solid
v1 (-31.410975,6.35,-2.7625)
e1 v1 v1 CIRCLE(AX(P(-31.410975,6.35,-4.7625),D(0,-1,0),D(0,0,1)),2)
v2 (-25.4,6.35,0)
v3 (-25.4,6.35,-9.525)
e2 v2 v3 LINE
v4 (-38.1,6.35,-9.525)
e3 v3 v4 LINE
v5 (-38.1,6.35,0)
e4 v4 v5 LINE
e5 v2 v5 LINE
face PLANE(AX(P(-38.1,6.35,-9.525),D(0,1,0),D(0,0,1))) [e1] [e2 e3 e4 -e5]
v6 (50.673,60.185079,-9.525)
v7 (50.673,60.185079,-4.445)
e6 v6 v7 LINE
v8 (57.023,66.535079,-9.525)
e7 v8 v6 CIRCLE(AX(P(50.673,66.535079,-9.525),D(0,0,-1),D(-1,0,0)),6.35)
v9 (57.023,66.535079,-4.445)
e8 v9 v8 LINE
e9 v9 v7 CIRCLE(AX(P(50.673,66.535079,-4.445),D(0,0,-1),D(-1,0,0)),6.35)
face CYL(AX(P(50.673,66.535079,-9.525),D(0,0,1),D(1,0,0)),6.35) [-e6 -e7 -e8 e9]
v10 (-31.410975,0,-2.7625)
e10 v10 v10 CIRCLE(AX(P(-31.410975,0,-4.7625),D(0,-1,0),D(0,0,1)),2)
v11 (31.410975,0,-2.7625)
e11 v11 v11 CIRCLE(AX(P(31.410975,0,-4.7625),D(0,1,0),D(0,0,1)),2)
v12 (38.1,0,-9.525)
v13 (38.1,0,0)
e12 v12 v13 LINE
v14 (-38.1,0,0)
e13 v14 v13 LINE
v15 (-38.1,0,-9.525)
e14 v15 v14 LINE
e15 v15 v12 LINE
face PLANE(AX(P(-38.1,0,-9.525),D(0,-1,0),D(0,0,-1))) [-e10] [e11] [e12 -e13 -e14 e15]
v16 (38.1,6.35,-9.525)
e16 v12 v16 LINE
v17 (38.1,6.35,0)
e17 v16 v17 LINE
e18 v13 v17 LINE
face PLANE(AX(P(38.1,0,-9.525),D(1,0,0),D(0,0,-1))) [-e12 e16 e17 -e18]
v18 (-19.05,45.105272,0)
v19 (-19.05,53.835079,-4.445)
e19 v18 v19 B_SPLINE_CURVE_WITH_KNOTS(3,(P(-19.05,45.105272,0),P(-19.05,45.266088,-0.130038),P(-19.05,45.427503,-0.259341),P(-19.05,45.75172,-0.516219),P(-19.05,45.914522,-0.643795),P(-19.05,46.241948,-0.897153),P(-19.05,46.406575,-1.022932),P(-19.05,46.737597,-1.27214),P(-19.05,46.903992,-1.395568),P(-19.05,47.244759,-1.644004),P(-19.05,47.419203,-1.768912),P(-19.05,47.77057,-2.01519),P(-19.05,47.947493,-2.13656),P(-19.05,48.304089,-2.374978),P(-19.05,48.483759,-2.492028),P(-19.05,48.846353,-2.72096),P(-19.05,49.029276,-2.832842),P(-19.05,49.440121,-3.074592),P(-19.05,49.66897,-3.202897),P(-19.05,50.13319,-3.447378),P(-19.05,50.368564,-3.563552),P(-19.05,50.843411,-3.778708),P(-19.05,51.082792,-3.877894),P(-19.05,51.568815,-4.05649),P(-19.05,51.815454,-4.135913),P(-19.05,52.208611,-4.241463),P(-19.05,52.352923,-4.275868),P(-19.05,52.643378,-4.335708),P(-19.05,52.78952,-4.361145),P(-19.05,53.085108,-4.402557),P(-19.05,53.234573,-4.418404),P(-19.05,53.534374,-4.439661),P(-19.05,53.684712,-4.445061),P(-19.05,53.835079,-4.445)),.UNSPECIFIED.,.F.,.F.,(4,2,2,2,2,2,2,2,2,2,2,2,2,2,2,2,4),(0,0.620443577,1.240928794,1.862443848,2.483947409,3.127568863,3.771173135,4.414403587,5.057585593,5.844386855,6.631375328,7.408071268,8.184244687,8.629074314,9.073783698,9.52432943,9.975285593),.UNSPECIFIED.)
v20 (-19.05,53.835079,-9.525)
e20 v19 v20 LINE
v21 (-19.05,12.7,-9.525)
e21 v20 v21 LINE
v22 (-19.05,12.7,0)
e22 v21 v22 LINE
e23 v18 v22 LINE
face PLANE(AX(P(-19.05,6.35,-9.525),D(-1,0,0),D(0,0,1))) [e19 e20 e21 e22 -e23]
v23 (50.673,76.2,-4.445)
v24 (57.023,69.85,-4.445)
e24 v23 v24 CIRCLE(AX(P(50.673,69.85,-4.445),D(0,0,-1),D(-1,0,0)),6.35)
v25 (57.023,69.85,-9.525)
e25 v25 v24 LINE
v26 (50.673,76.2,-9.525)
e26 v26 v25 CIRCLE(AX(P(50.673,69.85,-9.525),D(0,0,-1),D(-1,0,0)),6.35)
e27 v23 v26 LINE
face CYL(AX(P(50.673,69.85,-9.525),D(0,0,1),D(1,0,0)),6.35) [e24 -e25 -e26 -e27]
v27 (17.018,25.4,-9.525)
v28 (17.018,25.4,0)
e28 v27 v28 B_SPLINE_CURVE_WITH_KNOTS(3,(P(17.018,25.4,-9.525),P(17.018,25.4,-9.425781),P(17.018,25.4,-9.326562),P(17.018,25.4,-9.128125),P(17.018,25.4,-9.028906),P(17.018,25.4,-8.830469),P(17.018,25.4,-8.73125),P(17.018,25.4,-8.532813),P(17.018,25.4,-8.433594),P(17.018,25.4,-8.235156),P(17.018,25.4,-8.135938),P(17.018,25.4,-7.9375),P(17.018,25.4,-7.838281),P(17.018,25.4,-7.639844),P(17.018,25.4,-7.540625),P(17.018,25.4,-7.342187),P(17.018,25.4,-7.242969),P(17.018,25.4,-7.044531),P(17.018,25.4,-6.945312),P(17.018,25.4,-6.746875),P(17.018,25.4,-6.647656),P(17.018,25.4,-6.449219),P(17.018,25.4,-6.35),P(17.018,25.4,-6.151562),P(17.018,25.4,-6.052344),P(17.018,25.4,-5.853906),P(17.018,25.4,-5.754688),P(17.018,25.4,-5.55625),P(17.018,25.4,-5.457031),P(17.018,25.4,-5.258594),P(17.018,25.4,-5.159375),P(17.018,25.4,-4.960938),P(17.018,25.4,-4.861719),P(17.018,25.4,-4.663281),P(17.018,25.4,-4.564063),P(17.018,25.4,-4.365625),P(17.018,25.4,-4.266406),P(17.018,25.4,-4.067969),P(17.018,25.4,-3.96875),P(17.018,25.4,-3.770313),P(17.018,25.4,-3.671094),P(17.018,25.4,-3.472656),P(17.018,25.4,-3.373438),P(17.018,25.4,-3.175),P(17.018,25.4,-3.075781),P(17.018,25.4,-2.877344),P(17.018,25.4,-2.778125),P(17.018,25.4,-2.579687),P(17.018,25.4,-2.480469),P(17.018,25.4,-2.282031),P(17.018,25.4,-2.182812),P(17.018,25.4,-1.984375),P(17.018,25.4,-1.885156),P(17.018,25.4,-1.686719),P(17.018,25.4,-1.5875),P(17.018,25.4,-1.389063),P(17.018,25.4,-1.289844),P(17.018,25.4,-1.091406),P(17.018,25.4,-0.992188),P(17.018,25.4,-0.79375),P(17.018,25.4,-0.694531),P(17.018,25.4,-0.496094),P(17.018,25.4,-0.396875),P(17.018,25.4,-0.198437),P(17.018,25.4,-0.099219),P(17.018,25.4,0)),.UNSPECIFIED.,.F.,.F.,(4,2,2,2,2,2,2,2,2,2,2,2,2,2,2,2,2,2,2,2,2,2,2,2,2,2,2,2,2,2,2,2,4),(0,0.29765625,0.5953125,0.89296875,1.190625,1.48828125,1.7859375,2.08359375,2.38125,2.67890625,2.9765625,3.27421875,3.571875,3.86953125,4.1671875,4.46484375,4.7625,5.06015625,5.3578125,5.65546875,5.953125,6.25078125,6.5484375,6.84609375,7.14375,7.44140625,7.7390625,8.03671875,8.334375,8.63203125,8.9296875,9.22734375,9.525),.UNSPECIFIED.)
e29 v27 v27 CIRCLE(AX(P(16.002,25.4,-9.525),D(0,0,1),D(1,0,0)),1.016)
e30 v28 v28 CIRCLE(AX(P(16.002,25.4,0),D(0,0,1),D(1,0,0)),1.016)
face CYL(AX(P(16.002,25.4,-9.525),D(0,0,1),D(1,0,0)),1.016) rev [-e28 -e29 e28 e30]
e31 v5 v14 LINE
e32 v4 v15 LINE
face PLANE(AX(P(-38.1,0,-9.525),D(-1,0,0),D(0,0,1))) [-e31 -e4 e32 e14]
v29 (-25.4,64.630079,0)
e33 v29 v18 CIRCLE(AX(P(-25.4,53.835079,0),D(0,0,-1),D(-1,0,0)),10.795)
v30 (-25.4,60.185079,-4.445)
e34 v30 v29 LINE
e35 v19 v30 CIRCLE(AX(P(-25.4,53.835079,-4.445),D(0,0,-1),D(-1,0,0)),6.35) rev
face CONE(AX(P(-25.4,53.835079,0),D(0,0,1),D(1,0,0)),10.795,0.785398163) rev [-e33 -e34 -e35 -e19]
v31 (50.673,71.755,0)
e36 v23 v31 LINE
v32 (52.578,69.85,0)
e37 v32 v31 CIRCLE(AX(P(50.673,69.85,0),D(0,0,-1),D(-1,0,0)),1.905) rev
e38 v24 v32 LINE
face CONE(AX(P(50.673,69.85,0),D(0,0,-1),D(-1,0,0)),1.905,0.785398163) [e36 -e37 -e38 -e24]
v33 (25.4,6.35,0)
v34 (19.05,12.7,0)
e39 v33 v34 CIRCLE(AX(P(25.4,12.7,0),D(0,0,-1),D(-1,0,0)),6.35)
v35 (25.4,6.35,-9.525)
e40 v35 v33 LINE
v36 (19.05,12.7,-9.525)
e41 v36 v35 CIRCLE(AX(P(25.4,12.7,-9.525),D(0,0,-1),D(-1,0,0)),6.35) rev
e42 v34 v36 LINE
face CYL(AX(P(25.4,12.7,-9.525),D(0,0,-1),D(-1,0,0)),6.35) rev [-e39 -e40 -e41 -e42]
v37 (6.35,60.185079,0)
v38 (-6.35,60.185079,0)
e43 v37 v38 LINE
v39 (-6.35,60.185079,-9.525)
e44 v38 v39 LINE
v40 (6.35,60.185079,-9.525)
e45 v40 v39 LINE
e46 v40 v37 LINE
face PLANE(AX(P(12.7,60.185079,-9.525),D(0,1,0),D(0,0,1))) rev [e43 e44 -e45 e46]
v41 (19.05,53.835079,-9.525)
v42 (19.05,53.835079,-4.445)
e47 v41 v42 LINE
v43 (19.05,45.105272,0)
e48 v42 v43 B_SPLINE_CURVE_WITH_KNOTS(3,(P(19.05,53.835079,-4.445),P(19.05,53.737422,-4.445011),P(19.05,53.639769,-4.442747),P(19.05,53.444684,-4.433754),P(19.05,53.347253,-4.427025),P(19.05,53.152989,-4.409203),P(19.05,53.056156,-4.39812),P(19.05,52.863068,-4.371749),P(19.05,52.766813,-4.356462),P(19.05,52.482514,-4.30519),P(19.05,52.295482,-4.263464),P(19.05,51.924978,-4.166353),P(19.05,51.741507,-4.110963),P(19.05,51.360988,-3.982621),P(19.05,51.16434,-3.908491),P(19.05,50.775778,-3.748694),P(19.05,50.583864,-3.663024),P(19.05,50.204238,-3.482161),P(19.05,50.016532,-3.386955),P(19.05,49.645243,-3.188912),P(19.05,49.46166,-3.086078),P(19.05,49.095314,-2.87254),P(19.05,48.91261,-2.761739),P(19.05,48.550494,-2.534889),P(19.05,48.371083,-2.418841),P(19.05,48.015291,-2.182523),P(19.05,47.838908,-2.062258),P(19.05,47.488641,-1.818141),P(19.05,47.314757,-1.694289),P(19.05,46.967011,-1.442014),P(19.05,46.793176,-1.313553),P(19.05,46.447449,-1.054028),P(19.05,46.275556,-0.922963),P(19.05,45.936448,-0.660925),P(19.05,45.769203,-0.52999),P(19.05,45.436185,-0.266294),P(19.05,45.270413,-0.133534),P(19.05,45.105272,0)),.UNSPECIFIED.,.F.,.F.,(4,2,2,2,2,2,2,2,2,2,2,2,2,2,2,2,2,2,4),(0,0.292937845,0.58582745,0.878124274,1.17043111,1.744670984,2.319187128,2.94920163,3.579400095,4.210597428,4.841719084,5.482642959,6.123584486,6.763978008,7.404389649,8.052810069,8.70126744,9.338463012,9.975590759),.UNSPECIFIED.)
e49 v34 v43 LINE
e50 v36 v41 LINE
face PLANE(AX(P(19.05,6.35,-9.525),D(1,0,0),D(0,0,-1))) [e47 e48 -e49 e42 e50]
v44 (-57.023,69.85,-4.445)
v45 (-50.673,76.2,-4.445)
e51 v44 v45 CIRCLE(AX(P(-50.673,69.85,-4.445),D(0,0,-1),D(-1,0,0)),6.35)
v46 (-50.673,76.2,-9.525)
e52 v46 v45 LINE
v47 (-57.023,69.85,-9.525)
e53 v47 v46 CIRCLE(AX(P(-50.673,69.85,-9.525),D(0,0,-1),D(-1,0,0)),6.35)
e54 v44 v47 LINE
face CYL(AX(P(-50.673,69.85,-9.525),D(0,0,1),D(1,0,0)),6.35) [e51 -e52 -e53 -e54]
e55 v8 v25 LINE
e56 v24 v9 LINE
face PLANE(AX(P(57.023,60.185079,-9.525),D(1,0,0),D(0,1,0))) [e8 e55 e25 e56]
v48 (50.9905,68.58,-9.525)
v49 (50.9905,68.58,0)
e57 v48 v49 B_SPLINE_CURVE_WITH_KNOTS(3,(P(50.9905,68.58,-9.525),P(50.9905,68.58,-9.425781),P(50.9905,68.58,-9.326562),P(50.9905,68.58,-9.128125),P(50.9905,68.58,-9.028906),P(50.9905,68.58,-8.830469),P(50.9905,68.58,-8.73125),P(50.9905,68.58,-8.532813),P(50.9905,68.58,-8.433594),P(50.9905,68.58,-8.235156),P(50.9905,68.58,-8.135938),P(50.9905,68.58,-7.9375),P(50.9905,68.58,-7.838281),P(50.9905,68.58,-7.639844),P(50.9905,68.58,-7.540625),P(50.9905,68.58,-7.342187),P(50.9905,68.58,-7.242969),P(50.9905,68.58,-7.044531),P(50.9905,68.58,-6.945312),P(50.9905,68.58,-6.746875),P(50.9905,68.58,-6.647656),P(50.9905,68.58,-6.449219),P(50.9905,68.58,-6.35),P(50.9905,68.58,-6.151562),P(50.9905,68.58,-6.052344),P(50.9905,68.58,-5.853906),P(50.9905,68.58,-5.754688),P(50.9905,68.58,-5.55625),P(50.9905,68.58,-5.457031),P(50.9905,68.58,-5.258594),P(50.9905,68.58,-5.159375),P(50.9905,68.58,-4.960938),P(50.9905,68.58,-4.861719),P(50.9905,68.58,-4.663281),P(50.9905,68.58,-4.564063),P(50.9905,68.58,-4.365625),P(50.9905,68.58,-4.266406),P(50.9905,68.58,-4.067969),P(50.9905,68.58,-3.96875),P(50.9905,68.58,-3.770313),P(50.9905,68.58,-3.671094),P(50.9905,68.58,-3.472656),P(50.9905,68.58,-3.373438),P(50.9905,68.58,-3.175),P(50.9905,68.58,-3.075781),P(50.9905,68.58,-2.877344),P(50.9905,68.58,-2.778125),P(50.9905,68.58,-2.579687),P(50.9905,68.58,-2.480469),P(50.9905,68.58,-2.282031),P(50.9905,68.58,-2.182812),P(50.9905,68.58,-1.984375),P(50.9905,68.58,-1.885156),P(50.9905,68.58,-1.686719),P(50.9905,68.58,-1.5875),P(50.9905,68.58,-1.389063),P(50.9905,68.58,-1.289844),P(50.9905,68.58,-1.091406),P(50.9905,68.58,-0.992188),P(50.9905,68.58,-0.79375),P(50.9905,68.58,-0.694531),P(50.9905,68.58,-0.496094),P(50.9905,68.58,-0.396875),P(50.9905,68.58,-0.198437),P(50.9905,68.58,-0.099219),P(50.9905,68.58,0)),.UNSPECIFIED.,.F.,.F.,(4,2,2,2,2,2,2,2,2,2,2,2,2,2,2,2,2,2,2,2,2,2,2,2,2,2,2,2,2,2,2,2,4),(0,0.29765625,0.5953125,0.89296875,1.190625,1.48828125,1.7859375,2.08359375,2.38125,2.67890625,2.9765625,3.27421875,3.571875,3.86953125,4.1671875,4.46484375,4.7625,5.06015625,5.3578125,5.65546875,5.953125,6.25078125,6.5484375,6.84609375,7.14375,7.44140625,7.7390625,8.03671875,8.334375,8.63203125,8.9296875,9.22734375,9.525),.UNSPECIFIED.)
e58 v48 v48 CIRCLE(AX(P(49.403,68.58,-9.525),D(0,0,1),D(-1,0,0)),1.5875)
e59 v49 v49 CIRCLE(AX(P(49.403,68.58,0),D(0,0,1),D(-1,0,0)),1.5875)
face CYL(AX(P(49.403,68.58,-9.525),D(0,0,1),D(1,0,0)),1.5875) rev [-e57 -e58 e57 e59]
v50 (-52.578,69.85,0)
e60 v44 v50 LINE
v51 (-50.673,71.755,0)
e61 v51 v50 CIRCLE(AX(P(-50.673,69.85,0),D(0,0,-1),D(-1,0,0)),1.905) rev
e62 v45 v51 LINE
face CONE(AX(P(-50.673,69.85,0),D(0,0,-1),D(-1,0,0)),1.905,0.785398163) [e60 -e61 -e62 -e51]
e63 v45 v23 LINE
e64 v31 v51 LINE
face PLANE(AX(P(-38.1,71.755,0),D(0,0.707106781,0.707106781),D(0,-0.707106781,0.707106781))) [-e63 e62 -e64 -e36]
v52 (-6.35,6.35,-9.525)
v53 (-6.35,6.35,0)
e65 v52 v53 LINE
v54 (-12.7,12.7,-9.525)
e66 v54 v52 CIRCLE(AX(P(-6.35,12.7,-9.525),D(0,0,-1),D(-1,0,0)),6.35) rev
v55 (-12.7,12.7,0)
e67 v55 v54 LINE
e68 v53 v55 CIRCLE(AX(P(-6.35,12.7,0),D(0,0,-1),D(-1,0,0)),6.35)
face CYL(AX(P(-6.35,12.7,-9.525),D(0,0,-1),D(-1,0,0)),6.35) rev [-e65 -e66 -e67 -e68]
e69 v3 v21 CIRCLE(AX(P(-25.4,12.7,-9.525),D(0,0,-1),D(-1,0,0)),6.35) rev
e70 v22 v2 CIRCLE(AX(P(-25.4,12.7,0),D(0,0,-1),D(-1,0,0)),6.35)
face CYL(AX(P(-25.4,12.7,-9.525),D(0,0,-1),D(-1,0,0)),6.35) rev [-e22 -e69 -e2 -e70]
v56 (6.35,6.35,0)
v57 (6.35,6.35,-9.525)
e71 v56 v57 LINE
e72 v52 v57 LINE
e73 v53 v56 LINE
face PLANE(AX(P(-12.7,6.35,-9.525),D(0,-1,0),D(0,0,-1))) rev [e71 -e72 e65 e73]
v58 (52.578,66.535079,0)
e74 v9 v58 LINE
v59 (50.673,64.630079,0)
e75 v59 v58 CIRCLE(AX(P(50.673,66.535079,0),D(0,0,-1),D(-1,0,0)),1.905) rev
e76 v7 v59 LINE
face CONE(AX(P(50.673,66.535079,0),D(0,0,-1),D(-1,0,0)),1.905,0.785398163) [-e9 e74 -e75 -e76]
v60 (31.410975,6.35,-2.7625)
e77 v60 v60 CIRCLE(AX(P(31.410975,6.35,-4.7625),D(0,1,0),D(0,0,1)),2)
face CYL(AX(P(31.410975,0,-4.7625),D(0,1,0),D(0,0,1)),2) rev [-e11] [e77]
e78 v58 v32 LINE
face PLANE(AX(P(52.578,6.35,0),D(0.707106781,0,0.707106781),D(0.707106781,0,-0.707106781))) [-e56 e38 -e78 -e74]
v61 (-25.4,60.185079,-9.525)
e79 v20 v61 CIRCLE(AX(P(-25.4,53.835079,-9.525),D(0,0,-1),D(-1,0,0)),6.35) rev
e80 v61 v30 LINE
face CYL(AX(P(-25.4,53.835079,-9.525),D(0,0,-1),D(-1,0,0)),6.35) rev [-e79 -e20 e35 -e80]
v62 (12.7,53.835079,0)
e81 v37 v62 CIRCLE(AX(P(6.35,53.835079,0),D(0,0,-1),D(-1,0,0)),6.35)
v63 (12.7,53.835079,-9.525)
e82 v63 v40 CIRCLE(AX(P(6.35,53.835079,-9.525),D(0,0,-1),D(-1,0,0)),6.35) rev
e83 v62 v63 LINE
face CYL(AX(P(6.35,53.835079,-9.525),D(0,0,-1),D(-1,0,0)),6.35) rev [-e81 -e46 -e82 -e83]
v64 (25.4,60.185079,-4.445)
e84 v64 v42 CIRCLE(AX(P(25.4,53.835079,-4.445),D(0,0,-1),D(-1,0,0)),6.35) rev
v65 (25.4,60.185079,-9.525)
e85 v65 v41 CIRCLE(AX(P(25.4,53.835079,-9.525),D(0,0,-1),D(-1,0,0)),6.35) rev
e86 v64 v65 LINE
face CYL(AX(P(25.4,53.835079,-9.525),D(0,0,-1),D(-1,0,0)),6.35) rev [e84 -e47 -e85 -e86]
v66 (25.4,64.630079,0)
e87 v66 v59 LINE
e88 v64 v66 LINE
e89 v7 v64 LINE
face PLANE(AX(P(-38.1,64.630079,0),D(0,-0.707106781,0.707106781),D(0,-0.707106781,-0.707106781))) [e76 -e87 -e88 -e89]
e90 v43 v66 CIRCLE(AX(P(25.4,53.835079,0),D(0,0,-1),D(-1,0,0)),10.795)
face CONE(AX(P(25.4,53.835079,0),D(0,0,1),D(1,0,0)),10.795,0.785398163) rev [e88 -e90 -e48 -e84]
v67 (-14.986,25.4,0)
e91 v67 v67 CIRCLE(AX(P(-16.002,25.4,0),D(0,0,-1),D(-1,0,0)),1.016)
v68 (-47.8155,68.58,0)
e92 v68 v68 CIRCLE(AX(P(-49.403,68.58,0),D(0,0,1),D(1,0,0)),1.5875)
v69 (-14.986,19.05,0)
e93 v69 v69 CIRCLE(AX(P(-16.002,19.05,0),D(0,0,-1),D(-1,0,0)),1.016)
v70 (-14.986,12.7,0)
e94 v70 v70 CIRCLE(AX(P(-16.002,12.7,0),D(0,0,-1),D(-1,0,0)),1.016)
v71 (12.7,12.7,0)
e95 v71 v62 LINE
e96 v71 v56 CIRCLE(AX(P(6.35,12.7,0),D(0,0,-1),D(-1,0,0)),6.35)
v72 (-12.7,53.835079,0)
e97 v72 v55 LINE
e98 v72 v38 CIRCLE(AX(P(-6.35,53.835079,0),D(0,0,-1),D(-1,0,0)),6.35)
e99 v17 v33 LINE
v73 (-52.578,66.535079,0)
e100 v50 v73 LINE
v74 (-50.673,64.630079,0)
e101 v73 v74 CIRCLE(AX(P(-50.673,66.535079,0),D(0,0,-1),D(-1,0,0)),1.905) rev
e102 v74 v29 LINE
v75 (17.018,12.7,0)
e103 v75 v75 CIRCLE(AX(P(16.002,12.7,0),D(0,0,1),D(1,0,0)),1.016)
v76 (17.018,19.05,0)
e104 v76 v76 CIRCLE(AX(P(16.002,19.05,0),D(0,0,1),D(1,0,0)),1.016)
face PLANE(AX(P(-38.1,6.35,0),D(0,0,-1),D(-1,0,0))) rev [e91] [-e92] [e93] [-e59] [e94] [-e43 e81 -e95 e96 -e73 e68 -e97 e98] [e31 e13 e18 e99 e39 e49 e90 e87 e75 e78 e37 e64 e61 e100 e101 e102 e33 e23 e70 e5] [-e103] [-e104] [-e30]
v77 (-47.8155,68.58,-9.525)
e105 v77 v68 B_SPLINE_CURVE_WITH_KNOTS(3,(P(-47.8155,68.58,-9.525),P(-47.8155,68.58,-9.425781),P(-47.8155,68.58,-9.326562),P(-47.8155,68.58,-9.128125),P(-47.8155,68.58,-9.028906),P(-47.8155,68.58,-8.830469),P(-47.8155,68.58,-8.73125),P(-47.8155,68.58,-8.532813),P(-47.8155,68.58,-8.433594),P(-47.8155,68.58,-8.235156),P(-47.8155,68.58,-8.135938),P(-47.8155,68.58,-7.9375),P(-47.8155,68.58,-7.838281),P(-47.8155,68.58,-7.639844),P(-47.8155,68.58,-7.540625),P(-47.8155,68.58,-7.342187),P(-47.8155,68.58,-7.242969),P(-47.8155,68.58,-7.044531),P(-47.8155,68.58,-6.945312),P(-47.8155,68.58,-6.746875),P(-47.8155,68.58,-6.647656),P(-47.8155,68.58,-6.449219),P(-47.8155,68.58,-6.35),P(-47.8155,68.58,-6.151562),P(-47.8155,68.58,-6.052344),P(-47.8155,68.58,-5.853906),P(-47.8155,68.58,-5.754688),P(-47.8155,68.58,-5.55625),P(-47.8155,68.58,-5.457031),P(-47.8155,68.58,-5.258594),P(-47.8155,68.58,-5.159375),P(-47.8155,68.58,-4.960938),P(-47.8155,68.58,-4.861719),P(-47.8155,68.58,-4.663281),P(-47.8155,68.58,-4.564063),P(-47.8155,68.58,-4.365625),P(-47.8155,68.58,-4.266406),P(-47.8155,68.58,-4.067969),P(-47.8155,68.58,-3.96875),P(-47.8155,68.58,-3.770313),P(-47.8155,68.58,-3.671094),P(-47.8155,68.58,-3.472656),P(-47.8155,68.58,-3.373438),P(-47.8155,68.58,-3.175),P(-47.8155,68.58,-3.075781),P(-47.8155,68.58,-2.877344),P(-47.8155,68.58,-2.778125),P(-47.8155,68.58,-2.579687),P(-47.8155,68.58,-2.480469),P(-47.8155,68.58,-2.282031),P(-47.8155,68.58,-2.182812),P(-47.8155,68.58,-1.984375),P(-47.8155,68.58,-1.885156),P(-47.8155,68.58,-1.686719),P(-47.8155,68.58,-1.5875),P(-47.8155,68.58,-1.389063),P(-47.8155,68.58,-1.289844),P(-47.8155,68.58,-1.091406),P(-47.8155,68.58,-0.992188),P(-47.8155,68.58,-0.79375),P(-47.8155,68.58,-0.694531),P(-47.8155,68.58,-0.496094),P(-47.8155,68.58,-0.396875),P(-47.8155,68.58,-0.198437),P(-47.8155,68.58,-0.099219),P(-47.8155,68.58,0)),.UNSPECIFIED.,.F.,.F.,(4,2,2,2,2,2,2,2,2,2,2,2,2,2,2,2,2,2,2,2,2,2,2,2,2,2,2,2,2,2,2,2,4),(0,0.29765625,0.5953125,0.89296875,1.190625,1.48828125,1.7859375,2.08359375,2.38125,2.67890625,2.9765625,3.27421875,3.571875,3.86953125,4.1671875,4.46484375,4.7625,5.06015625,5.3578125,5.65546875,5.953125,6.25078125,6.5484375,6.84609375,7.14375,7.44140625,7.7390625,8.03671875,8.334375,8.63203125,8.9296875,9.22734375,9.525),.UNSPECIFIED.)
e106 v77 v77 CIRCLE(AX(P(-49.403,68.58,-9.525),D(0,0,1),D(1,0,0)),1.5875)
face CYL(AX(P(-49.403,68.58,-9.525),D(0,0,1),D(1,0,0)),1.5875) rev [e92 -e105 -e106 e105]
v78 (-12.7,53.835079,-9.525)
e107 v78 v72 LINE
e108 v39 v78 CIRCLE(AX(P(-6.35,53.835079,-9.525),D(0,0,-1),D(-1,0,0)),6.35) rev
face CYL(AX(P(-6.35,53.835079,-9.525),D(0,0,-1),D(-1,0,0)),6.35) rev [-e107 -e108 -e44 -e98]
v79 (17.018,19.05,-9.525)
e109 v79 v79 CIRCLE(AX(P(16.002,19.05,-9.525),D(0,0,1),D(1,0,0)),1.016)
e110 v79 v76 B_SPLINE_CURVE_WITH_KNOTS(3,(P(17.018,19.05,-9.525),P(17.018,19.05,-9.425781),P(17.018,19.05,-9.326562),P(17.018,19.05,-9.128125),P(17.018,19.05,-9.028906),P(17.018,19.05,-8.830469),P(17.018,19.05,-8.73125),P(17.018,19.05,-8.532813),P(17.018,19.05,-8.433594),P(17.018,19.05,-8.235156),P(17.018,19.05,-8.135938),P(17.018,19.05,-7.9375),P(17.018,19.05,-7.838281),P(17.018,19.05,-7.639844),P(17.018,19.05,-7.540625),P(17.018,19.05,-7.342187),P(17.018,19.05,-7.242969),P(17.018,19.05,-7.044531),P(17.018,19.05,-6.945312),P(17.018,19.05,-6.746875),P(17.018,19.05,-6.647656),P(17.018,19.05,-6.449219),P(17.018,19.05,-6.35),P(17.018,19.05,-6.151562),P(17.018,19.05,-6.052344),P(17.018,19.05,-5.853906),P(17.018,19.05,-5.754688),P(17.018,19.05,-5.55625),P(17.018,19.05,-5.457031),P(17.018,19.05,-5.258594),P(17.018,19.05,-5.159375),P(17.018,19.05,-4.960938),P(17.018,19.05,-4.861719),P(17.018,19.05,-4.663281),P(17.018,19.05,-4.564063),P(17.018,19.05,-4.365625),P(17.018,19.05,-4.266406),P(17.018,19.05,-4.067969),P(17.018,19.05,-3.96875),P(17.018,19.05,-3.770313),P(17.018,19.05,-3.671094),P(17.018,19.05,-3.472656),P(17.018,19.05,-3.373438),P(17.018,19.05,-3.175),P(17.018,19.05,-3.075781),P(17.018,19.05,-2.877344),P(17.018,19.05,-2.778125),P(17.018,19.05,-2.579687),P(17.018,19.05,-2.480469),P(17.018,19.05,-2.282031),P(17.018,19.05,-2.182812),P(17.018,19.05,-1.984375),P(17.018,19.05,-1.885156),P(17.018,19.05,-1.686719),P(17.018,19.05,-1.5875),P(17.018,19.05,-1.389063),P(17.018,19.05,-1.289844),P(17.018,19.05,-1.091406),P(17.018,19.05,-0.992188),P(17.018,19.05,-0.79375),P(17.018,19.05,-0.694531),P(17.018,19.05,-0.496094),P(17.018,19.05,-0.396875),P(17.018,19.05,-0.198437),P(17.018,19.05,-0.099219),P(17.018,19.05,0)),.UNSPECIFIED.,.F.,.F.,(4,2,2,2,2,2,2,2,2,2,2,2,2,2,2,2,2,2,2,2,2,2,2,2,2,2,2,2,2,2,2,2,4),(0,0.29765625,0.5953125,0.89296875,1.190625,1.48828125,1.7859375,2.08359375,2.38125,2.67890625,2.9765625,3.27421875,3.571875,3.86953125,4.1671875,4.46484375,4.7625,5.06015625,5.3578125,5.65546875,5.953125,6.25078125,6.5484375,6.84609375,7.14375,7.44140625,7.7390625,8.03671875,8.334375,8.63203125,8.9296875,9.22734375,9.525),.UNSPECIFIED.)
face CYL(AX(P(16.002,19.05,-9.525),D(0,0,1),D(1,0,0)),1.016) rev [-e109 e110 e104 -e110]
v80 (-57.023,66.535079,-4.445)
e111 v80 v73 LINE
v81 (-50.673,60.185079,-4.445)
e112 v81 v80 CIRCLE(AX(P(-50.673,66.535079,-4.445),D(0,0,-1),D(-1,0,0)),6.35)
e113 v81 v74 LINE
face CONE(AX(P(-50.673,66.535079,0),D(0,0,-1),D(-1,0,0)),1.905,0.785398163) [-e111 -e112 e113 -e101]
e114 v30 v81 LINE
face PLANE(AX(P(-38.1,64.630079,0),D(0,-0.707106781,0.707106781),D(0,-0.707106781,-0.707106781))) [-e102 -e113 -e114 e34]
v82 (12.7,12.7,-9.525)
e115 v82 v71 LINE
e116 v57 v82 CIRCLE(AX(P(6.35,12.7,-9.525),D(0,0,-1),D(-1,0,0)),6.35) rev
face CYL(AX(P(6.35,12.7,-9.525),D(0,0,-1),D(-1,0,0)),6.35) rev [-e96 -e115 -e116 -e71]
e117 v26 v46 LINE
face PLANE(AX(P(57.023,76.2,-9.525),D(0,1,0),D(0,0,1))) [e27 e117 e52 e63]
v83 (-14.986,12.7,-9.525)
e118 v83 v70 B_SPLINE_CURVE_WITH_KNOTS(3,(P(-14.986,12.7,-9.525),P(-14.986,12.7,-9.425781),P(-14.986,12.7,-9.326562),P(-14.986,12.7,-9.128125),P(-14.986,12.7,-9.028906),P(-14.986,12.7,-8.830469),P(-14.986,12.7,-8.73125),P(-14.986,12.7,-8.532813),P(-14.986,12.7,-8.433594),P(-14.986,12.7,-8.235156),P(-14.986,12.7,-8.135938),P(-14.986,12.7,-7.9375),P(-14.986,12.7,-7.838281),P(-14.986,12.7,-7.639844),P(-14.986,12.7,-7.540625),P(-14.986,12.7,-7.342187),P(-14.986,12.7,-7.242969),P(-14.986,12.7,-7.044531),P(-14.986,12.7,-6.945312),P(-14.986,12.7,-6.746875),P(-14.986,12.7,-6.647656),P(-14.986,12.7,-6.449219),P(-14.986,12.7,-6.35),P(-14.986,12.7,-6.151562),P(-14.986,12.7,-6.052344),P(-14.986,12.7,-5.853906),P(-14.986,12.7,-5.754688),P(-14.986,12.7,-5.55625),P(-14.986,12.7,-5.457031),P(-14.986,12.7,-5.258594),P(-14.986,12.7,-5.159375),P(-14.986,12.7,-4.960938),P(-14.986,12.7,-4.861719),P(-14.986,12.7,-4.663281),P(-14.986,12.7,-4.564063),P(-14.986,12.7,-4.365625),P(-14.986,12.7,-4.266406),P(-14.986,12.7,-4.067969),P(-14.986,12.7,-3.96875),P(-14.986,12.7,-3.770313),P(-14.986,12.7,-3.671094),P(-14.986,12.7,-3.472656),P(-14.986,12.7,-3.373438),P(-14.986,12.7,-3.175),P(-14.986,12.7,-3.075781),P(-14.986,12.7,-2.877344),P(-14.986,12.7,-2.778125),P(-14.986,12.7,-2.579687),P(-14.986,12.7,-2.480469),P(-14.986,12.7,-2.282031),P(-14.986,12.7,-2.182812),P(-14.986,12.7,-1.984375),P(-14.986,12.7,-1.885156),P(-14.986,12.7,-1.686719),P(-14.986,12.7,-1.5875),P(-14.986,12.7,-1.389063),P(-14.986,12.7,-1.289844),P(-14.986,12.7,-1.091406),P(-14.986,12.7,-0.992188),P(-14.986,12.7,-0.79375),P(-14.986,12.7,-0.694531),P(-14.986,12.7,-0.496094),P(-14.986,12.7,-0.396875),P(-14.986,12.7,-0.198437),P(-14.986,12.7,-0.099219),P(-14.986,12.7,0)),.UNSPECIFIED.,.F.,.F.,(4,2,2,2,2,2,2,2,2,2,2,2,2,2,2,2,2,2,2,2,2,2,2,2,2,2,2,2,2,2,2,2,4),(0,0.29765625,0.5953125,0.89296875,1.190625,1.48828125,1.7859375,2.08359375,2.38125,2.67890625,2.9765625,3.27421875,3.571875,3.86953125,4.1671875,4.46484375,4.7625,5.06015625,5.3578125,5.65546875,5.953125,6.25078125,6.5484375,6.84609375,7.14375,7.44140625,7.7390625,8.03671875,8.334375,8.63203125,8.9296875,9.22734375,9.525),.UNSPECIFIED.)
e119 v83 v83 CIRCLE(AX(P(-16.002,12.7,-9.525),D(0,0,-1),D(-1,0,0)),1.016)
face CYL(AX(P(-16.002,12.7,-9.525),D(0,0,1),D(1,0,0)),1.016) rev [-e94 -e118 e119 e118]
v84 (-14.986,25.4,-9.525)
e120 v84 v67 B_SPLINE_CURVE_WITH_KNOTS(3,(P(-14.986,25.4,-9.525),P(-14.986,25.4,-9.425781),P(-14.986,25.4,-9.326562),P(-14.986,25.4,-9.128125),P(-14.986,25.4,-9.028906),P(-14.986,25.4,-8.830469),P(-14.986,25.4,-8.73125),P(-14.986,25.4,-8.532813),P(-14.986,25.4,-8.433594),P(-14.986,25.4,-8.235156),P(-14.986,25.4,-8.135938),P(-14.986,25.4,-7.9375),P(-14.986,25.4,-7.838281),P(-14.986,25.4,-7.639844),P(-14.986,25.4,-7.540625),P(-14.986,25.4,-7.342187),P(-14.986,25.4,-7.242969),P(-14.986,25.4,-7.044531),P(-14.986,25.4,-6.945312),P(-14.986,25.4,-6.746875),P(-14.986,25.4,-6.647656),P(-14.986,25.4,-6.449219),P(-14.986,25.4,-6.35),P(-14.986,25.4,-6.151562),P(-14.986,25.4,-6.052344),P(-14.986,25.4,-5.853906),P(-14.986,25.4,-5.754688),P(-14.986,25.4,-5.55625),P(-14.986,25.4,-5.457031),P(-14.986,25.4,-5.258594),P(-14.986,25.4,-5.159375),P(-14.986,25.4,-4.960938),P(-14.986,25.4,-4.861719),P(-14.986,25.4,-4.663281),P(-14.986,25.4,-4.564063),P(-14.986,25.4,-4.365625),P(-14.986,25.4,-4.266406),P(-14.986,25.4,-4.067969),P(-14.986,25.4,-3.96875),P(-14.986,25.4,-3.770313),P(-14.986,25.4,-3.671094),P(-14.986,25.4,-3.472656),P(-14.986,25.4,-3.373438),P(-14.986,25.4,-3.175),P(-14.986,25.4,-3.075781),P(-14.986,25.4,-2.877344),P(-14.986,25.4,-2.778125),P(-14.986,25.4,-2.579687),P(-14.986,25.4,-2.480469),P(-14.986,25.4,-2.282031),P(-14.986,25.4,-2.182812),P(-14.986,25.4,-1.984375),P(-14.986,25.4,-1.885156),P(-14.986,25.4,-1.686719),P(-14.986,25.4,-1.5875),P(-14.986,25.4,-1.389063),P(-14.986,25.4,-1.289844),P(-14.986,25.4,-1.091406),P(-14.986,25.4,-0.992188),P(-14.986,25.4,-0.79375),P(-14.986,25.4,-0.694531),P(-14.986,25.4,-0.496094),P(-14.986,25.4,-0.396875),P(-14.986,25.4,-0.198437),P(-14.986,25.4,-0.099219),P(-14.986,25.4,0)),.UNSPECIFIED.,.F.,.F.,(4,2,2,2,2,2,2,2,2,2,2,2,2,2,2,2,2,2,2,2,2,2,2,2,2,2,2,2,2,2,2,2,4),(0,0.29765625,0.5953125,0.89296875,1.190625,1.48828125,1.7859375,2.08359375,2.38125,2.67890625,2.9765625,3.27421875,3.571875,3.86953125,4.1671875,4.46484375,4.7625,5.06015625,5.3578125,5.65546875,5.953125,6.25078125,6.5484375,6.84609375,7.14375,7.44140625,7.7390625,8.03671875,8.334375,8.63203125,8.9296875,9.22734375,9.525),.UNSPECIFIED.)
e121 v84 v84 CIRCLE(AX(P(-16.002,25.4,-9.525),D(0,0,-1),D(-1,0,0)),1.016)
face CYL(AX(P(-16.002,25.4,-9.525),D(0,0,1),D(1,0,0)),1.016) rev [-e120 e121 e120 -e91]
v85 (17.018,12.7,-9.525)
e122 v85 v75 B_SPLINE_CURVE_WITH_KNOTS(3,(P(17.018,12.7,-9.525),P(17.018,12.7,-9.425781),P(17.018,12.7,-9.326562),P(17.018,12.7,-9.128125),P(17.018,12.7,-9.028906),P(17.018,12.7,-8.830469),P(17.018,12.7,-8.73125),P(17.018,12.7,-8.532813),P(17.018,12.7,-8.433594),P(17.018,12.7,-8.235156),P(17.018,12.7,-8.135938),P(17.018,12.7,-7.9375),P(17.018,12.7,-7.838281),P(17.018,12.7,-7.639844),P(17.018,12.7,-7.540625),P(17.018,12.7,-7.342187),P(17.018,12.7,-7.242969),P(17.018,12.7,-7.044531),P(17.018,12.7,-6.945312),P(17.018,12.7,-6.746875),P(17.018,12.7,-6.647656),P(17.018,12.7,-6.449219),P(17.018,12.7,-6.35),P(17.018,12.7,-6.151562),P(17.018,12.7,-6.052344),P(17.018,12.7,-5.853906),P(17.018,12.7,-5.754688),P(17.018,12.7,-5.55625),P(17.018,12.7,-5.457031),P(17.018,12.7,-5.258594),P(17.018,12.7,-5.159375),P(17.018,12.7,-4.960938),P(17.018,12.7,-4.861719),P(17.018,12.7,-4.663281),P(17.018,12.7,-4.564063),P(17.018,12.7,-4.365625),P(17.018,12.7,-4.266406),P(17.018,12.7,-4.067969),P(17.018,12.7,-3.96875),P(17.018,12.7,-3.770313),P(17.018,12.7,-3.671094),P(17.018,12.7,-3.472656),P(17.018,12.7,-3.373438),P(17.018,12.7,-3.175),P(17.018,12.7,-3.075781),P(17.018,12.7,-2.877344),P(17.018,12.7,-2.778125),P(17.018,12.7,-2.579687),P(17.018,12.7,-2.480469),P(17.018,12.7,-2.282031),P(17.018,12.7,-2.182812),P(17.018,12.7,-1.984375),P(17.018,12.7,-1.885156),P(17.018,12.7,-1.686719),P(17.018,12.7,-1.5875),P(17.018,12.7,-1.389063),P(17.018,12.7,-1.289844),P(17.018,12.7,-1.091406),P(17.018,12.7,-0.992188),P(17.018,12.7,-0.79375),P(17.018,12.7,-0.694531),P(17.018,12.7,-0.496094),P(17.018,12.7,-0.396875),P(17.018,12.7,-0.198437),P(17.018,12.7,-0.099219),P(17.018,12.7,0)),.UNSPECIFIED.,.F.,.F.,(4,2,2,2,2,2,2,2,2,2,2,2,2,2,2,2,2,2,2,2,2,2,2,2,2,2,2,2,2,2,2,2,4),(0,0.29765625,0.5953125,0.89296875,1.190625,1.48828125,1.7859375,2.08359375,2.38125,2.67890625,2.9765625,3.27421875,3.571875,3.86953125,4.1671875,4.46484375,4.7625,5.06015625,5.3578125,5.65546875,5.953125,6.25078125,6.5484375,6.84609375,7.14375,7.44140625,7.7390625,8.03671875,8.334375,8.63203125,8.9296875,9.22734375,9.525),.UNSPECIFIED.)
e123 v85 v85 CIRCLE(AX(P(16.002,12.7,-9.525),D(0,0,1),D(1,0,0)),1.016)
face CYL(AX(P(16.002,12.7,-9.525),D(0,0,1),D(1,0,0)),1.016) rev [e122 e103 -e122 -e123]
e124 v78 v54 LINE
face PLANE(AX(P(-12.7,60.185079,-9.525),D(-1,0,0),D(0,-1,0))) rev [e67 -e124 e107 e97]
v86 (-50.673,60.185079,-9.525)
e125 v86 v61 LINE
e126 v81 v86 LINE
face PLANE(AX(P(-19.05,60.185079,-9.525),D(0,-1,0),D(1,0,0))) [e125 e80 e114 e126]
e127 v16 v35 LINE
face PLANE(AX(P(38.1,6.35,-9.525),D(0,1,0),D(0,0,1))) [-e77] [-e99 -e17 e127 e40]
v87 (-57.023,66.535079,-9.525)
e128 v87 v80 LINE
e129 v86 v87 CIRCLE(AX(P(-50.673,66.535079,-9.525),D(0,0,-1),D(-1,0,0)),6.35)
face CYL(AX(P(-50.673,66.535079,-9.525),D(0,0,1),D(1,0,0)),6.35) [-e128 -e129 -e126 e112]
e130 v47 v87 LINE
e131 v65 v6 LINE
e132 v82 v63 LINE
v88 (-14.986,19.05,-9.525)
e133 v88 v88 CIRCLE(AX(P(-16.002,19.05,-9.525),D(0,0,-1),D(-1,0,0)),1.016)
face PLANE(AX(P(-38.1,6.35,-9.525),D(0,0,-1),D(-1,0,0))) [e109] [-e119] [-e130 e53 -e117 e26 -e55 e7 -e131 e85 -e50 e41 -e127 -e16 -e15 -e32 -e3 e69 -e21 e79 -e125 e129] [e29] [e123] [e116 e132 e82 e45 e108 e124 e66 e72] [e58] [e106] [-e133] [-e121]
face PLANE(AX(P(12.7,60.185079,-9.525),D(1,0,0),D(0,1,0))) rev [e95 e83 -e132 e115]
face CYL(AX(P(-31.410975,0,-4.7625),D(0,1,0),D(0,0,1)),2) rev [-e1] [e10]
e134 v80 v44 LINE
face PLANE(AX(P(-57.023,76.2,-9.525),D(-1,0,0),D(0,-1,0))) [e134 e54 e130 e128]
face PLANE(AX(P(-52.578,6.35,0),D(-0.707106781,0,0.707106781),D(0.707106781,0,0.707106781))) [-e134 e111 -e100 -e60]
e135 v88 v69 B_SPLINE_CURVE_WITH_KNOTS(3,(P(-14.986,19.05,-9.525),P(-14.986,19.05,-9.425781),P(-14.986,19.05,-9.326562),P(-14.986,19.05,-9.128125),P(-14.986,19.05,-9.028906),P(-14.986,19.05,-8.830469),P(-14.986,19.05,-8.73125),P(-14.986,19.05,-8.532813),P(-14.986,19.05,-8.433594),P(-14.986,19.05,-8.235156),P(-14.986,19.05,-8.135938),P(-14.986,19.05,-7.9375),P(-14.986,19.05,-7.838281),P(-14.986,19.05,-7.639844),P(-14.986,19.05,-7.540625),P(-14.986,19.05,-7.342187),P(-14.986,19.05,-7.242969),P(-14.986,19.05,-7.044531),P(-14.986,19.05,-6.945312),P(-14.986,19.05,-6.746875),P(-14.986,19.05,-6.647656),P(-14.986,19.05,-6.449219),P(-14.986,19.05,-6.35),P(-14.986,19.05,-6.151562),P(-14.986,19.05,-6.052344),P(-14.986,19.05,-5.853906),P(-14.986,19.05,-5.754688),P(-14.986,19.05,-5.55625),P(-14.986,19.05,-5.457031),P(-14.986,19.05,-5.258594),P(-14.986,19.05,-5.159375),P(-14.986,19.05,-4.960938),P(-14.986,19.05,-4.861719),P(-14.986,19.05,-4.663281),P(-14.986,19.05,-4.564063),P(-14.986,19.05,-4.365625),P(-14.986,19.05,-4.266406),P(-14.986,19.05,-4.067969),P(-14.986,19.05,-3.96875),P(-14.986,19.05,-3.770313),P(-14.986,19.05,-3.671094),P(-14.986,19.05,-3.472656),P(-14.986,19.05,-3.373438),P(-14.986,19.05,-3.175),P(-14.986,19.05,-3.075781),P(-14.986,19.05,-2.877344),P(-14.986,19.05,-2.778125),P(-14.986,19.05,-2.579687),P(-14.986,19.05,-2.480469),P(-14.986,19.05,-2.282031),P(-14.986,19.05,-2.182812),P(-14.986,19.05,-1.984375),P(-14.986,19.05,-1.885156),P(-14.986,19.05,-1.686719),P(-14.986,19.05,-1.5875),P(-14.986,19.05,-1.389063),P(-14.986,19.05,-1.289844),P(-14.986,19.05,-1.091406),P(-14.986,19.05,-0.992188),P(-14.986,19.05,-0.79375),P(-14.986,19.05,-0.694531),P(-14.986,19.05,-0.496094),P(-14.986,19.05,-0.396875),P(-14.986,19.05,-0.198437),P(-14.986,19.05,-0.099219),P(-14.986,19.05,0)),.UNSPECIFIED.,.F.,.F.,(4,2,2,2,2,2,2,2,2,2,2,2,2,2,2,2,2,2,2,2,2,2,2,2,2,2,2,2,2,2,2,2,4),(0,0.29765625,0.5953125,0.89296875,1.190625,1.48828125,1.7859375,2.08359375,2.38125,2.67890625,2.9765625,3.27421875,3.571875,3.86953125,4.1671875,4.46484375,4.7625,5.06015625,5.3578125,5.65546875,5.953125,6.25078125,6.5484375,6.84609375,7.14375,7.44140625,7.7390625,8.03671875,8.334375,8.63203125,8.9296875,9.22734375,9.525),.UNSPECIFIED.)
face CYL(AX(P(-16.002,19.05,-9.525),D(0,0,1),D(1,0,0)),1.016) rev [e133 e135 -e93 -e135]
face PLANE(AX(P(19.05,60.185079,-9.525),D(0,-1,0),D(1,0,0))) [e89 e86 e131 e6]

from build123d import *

# Parameters (mm, degrees)
SKETCH1_R                 = 1.5875
SKETCH1_W                 = 25.4
SKETCH1_H                 = 53.835078528
EXTRUDE1_DEPTH            = 9.525
FILLET1_R                 = 6.35
FILLET2_R                 = 6.35
CHAMFER3_SIZE             = 4.445
SKETCH2_R                 = 2.000000064
CUT_EXTRUDE1_DEPTH        = 91.671774296
SKETCH3_R                 = 1.016
CUT_EXTRUDE2_DEPTH        = 96.649297718
LPATTERN1_COUNT           = 3
LPATTERN1_PITCH           = 6.35
LPATTERN1_COPY_1_SKETCH_R = 1.016
LPATTERN1_COPY_1_DEPTH    = 96.649297718
LPATTERN1_COPY_2_SKETCH_R = 1.016
LPATTERN1_COPY_2_DEPTH    = 96.649297718


with BuildPart() as part:
    # Sketch1 → Extrude1 (new body)
    with BuildSketch(Plane.XY):
        Polygon((57.023, 60.185078528), (57.023, 76.2), (-57.023, 76.2), (-57.023, 60.185078528), (-19.05, 60.185078528), (-19.05, 6.35), (-38.1, 6.35), (-38.1, 0), (38.1, 0), (38.1, 6.35), (19.05, 6.35), (19.05, 60.185078528), align=None)
        with Locations((-49.403, 68.58)):
            Circle(SKETCH1_R, mode=Mode.SUBTRACT)
        with Locations((49.403, 68.58)):
            Circle(SKETCH1_R, mode=Mode.SUBTRACT)
        with Locations((0, 33.267539264)):
            Rectangle(SKETCH1_W, SKETCH1_H, mode=Mode.SUBTRACT)
    extrude(amount=-EXTRUDE1_DEPTH)

    # Fillet1
    fillet1_edges = [part.edges().sort_by_distance(p)[0] for p in [
        (-57.023, 60.185078528, -4.7625),
        (-57.023, 76.2, -4.7625),
        (57.023, 76.2, -4.7625),
        (57.023, 60.185078528, -4.7625),
    ]]
    fillet(fillet1_edges, radius=FILLET1_R)

    # Fillet2
    fillet2_edges = [part.edges().sort_by_distance(p)[0] for p in [
        (-19.05, 6.35, -4.7625),
        (-19.05, 60.185078528, -4.7625),
        (19.05, 60.185078528, -4.7625),
        (19.05, 6.35, -4.7625),
        (-12.7, 60.185078528, -4.7625),
        (12.7, 60.185078528, -4.7625),
        (12.7, 6.35, -4.7625),
        (-12.7, 6.35, -4.7625),
    ]]
    fillet(fillet2_edges, radius=FILLET2_R)

    # Chamfer3
    # the kernel refuses this chamfer: 4.445 mm, written as the material it takes off along each edge
    with BuildSketch(Plane(origin=(50.673, 76.2, 0), x_dir=(0, -0.9996219169112966, 0.02749587661058641), z_dir=(-1, 0, 0))) as chamfer3_piece_1:
        Polygon((CHAMFER3_SIZE * 0.999621916911, -CHAMFER3_SIZE * 0.0274958766106), (-CHAMFER3_SIZE * 0.0274958766106, -CHAMFER3_SIZE * 0.999621916911), (0, 0), align=None)
    extrude(amount=101.346, mode=Mode.SUBTRACT)
    with BuildSketch(Plane(origin=(57.023, 66.535078528, 0), x_dir=(-0.9996219169112966, 0, 0.027495876610586344), z_dir=(0, 1, 0)), Plane(origin=(-57.023, 69.85, 0), x_dir=(0.9996219169112966, 0, 0.027495876610586344), z_dir=(0, -1, 0))) as chamfer3_piece_2:
        Polygon((CHAMFER3_SIZE * 0.999621916911, -CHAMFER3_SIZE * 0.0274958766106), (-CHAMFER3_SIZE * 0.0274958766106, -CHAMFER3_SIZE * 0.999621916911), (0, 0), align=None)
    extrude(amount=3.314921472, mode=Mode.SUBTRACT)
    with BuildSketch(Plane(origin=(-50.673, 60.185078528, 0), x_dir=(0, 0.9996219169112966, 0.027495876610586344), z_dir=(1, 0, 0)), Plane(origin=(25.4, 60.185078528, 0), x_dir=(0, 0.9996219169112966, 0.02749587661058641), z_dir=(1, 0, 0))) as chamfer3_piece_3:
        Polygon((CHAMFER3_SIZE * 0.999621916911, -CHAMFER3_SIZE * 0.0274958766106), (-CHAMFER3_SIZE * 0.0274958766106, -CHAMFER3_SIZE * 0.999621916911), (0, 0), align=None)
    extrude(amount=25.273, mode=Mode.SUBTRACT)
    with BuildSketch(Plane(origin=(50.673, 66.535078528, 0), x_dir=(1, 0, 0), z_dir=(0, 1, 0))) as chamfer3_piece_4:
        Polygon((6.35 - CHAMFER3_SIZE, 0), (6.35, CHAMFER3_SIZE), (6.35, 0), align=None)
    revolve(axis=Axis((50.673, 66.535078528, 0), (0, 0, -1)), revolution_arc=90, mode=Mode.SUBTRACT)
    with BuildSketch(Plane(origin=(-50.673, 66.535078528, 0), x_dir=(-1, 0, 0), z_dir=(0, 1, 0))) as chamfer3_piece_5:
        Polygon((6.35 - CHAMFER3_SIZE, 0), (6.35, -CHAMFER3_SIZE), (6.35, 0), align=None)
    revolve(axis=Axis((-50.673, 66.535078528, 0), (0, 0, 1)), revolution_arc=90, mode=Mode.SUBTRACT)
    with BuildSketch(Plane(origin=(50.673, 69.85, 0), x_dir=(1, 0, 0), z_dir=(0, -1, 0))) as chamfer3_piece_6:
        Polygon((6.35 - CHAMFER3_SIZE, 0), (6.35, -CHAMFER3_SIZE), (6.35, 0), align=None)
    revolve(axis=Axis((50.673, 69.85, 0), (0, 0, 1)), revolution_arc=90, mode=Mode.SUBTRACT)
    with BuildSketch(Plane(origin=(-50.673, 69.85, 0), x_dir=(0, 1, 0), z_dir=(1, 0, 0))) as chamfer3_piece_7:
        Polygon((6.35 - CHAMFER3_SIZE, 0), (6.35, -CHAMFER3_SIZE), (6.35, 0), align=None)
    revolve(axis=Axis((-50.673, 69.85, 0), (0, 0, 1)), revolution_arc=90, mode=Mode.SUBTRACT)
    with BuildSketch(Plane(origin=(25.4, 53.835078528, 0), x_dir=(0, 1, 0), z_dir=(1, 0, 0))) as chamfer3_piece_8:
        Polygon((6.35 + CHAMFER3_SIZE, 0), (6.35, -CHAMFER3_SIZE), (6.35, 0), align=None)
    revolve(axis=Axis((25.4, 53.835078528, 0), (0, 0, 1)), revolution_arc=193.184040246, mode=Mode.SUBTRACT)
    with BuildSketch(Plane(origin=(-25.4, 53.835078528, 0), x_dir=(0, 1, 0), z_dir=(-1, 0, 0))) as chamfer3_piece_9:
        Polygon((6.35 + CHAMFER3_SIZE, 0), (6.35, CHAMFER3_SIZE), (6.35, 0), align=None)
    revolve(axis=Axis((-25.4, 53.835078528, 0), (0, 0, -1)), revolution_arc=193.184040246, mode=Mode.SUBTRACT)

    # Sketch2 → Cut-Extrude1 (cut, through all)
    with BuildSketch(Plane(origin=(0, 6.35, 0), x_dir=(1, 0, 0), z_dir=(0, 1, 0))):
        with Locations(Location((31.410975272, 4.7625, 0), (0, 0, 270))):
            Circle(SKETCH2_R)
    cut_extrude1 = extrude(amount=-CUT_EXTRUDE1_DEPTH, mode=Mode.SUBTRACT)

    # Mirror1: Cut-Extrude1 across plane
    add(cut_extrude1.mirror(Plane(origin=(0, 0, 0), x_dir=(0, 0, 1), z_dir=(1, 0, 0))), mode=Mode.SUBTRACT)

    # Sketch3 → Cut-Extrude2 (cut, through all)
    with BuildSketch(Plane.XY):
        with Locations((16.002, 25.4)):
            Circle(SKETCH3_R)
    cut_extrude2 = extrude(amount=-CUT_EXTRUDE2_DEPTH, mode=Mode.SUBTRACT)

    # Mirror2: Cut-Extrude2 across plane
    add(cut_extrude2.mirror(Plane(origin=(0, 0, 0), x_dir=(0, 0, 1), z_dir=(1, 0, 0))), mode=Mode.SUBTRACT)

    # LPattern1: Cut-Extrude2 ×3
    with Locations(*[(0, -i * LPATTERN1_PITCH, 0) for i in range(1, LPATTERN1_COUNT)]):
        add(cut_extrude2, mode=Mode.SUBTRACT)

    # LPattern1 copy 1 sketch → LPattern1 copy 1 (cut, through all)
    with BuildSketch(Plane(origin=(0, -6.35, 0), x_dir=(-1, 0, 0), z_dir=(0, 0, 1))):
        with Locations((16.002, -25.4)):
            Circle(LPATTERN1_COPY_1_SKETCH_R)
    extrude(amount=-LPATTERN1_COPY_1_DEPTH, mode=Mode.SUBTRACT)

    # LPattern1 copy 2 sketch → LPattern1 copy 2 (cut, through all)
    with BuildSketch(Plane(origin=(0, -12.7, 0), x_dir=(-1, 0, 0), z_dir=(0, 0, 1))):
        with Locations((16.002, -25.4)):
            Circle(LPATTERN1_COPY_2_SKETCH_R)
    extrude(amount=-LPATTERN1_COPY_2_DEPTH, mode=Mode.SUBTRACT)


solid = part.part
